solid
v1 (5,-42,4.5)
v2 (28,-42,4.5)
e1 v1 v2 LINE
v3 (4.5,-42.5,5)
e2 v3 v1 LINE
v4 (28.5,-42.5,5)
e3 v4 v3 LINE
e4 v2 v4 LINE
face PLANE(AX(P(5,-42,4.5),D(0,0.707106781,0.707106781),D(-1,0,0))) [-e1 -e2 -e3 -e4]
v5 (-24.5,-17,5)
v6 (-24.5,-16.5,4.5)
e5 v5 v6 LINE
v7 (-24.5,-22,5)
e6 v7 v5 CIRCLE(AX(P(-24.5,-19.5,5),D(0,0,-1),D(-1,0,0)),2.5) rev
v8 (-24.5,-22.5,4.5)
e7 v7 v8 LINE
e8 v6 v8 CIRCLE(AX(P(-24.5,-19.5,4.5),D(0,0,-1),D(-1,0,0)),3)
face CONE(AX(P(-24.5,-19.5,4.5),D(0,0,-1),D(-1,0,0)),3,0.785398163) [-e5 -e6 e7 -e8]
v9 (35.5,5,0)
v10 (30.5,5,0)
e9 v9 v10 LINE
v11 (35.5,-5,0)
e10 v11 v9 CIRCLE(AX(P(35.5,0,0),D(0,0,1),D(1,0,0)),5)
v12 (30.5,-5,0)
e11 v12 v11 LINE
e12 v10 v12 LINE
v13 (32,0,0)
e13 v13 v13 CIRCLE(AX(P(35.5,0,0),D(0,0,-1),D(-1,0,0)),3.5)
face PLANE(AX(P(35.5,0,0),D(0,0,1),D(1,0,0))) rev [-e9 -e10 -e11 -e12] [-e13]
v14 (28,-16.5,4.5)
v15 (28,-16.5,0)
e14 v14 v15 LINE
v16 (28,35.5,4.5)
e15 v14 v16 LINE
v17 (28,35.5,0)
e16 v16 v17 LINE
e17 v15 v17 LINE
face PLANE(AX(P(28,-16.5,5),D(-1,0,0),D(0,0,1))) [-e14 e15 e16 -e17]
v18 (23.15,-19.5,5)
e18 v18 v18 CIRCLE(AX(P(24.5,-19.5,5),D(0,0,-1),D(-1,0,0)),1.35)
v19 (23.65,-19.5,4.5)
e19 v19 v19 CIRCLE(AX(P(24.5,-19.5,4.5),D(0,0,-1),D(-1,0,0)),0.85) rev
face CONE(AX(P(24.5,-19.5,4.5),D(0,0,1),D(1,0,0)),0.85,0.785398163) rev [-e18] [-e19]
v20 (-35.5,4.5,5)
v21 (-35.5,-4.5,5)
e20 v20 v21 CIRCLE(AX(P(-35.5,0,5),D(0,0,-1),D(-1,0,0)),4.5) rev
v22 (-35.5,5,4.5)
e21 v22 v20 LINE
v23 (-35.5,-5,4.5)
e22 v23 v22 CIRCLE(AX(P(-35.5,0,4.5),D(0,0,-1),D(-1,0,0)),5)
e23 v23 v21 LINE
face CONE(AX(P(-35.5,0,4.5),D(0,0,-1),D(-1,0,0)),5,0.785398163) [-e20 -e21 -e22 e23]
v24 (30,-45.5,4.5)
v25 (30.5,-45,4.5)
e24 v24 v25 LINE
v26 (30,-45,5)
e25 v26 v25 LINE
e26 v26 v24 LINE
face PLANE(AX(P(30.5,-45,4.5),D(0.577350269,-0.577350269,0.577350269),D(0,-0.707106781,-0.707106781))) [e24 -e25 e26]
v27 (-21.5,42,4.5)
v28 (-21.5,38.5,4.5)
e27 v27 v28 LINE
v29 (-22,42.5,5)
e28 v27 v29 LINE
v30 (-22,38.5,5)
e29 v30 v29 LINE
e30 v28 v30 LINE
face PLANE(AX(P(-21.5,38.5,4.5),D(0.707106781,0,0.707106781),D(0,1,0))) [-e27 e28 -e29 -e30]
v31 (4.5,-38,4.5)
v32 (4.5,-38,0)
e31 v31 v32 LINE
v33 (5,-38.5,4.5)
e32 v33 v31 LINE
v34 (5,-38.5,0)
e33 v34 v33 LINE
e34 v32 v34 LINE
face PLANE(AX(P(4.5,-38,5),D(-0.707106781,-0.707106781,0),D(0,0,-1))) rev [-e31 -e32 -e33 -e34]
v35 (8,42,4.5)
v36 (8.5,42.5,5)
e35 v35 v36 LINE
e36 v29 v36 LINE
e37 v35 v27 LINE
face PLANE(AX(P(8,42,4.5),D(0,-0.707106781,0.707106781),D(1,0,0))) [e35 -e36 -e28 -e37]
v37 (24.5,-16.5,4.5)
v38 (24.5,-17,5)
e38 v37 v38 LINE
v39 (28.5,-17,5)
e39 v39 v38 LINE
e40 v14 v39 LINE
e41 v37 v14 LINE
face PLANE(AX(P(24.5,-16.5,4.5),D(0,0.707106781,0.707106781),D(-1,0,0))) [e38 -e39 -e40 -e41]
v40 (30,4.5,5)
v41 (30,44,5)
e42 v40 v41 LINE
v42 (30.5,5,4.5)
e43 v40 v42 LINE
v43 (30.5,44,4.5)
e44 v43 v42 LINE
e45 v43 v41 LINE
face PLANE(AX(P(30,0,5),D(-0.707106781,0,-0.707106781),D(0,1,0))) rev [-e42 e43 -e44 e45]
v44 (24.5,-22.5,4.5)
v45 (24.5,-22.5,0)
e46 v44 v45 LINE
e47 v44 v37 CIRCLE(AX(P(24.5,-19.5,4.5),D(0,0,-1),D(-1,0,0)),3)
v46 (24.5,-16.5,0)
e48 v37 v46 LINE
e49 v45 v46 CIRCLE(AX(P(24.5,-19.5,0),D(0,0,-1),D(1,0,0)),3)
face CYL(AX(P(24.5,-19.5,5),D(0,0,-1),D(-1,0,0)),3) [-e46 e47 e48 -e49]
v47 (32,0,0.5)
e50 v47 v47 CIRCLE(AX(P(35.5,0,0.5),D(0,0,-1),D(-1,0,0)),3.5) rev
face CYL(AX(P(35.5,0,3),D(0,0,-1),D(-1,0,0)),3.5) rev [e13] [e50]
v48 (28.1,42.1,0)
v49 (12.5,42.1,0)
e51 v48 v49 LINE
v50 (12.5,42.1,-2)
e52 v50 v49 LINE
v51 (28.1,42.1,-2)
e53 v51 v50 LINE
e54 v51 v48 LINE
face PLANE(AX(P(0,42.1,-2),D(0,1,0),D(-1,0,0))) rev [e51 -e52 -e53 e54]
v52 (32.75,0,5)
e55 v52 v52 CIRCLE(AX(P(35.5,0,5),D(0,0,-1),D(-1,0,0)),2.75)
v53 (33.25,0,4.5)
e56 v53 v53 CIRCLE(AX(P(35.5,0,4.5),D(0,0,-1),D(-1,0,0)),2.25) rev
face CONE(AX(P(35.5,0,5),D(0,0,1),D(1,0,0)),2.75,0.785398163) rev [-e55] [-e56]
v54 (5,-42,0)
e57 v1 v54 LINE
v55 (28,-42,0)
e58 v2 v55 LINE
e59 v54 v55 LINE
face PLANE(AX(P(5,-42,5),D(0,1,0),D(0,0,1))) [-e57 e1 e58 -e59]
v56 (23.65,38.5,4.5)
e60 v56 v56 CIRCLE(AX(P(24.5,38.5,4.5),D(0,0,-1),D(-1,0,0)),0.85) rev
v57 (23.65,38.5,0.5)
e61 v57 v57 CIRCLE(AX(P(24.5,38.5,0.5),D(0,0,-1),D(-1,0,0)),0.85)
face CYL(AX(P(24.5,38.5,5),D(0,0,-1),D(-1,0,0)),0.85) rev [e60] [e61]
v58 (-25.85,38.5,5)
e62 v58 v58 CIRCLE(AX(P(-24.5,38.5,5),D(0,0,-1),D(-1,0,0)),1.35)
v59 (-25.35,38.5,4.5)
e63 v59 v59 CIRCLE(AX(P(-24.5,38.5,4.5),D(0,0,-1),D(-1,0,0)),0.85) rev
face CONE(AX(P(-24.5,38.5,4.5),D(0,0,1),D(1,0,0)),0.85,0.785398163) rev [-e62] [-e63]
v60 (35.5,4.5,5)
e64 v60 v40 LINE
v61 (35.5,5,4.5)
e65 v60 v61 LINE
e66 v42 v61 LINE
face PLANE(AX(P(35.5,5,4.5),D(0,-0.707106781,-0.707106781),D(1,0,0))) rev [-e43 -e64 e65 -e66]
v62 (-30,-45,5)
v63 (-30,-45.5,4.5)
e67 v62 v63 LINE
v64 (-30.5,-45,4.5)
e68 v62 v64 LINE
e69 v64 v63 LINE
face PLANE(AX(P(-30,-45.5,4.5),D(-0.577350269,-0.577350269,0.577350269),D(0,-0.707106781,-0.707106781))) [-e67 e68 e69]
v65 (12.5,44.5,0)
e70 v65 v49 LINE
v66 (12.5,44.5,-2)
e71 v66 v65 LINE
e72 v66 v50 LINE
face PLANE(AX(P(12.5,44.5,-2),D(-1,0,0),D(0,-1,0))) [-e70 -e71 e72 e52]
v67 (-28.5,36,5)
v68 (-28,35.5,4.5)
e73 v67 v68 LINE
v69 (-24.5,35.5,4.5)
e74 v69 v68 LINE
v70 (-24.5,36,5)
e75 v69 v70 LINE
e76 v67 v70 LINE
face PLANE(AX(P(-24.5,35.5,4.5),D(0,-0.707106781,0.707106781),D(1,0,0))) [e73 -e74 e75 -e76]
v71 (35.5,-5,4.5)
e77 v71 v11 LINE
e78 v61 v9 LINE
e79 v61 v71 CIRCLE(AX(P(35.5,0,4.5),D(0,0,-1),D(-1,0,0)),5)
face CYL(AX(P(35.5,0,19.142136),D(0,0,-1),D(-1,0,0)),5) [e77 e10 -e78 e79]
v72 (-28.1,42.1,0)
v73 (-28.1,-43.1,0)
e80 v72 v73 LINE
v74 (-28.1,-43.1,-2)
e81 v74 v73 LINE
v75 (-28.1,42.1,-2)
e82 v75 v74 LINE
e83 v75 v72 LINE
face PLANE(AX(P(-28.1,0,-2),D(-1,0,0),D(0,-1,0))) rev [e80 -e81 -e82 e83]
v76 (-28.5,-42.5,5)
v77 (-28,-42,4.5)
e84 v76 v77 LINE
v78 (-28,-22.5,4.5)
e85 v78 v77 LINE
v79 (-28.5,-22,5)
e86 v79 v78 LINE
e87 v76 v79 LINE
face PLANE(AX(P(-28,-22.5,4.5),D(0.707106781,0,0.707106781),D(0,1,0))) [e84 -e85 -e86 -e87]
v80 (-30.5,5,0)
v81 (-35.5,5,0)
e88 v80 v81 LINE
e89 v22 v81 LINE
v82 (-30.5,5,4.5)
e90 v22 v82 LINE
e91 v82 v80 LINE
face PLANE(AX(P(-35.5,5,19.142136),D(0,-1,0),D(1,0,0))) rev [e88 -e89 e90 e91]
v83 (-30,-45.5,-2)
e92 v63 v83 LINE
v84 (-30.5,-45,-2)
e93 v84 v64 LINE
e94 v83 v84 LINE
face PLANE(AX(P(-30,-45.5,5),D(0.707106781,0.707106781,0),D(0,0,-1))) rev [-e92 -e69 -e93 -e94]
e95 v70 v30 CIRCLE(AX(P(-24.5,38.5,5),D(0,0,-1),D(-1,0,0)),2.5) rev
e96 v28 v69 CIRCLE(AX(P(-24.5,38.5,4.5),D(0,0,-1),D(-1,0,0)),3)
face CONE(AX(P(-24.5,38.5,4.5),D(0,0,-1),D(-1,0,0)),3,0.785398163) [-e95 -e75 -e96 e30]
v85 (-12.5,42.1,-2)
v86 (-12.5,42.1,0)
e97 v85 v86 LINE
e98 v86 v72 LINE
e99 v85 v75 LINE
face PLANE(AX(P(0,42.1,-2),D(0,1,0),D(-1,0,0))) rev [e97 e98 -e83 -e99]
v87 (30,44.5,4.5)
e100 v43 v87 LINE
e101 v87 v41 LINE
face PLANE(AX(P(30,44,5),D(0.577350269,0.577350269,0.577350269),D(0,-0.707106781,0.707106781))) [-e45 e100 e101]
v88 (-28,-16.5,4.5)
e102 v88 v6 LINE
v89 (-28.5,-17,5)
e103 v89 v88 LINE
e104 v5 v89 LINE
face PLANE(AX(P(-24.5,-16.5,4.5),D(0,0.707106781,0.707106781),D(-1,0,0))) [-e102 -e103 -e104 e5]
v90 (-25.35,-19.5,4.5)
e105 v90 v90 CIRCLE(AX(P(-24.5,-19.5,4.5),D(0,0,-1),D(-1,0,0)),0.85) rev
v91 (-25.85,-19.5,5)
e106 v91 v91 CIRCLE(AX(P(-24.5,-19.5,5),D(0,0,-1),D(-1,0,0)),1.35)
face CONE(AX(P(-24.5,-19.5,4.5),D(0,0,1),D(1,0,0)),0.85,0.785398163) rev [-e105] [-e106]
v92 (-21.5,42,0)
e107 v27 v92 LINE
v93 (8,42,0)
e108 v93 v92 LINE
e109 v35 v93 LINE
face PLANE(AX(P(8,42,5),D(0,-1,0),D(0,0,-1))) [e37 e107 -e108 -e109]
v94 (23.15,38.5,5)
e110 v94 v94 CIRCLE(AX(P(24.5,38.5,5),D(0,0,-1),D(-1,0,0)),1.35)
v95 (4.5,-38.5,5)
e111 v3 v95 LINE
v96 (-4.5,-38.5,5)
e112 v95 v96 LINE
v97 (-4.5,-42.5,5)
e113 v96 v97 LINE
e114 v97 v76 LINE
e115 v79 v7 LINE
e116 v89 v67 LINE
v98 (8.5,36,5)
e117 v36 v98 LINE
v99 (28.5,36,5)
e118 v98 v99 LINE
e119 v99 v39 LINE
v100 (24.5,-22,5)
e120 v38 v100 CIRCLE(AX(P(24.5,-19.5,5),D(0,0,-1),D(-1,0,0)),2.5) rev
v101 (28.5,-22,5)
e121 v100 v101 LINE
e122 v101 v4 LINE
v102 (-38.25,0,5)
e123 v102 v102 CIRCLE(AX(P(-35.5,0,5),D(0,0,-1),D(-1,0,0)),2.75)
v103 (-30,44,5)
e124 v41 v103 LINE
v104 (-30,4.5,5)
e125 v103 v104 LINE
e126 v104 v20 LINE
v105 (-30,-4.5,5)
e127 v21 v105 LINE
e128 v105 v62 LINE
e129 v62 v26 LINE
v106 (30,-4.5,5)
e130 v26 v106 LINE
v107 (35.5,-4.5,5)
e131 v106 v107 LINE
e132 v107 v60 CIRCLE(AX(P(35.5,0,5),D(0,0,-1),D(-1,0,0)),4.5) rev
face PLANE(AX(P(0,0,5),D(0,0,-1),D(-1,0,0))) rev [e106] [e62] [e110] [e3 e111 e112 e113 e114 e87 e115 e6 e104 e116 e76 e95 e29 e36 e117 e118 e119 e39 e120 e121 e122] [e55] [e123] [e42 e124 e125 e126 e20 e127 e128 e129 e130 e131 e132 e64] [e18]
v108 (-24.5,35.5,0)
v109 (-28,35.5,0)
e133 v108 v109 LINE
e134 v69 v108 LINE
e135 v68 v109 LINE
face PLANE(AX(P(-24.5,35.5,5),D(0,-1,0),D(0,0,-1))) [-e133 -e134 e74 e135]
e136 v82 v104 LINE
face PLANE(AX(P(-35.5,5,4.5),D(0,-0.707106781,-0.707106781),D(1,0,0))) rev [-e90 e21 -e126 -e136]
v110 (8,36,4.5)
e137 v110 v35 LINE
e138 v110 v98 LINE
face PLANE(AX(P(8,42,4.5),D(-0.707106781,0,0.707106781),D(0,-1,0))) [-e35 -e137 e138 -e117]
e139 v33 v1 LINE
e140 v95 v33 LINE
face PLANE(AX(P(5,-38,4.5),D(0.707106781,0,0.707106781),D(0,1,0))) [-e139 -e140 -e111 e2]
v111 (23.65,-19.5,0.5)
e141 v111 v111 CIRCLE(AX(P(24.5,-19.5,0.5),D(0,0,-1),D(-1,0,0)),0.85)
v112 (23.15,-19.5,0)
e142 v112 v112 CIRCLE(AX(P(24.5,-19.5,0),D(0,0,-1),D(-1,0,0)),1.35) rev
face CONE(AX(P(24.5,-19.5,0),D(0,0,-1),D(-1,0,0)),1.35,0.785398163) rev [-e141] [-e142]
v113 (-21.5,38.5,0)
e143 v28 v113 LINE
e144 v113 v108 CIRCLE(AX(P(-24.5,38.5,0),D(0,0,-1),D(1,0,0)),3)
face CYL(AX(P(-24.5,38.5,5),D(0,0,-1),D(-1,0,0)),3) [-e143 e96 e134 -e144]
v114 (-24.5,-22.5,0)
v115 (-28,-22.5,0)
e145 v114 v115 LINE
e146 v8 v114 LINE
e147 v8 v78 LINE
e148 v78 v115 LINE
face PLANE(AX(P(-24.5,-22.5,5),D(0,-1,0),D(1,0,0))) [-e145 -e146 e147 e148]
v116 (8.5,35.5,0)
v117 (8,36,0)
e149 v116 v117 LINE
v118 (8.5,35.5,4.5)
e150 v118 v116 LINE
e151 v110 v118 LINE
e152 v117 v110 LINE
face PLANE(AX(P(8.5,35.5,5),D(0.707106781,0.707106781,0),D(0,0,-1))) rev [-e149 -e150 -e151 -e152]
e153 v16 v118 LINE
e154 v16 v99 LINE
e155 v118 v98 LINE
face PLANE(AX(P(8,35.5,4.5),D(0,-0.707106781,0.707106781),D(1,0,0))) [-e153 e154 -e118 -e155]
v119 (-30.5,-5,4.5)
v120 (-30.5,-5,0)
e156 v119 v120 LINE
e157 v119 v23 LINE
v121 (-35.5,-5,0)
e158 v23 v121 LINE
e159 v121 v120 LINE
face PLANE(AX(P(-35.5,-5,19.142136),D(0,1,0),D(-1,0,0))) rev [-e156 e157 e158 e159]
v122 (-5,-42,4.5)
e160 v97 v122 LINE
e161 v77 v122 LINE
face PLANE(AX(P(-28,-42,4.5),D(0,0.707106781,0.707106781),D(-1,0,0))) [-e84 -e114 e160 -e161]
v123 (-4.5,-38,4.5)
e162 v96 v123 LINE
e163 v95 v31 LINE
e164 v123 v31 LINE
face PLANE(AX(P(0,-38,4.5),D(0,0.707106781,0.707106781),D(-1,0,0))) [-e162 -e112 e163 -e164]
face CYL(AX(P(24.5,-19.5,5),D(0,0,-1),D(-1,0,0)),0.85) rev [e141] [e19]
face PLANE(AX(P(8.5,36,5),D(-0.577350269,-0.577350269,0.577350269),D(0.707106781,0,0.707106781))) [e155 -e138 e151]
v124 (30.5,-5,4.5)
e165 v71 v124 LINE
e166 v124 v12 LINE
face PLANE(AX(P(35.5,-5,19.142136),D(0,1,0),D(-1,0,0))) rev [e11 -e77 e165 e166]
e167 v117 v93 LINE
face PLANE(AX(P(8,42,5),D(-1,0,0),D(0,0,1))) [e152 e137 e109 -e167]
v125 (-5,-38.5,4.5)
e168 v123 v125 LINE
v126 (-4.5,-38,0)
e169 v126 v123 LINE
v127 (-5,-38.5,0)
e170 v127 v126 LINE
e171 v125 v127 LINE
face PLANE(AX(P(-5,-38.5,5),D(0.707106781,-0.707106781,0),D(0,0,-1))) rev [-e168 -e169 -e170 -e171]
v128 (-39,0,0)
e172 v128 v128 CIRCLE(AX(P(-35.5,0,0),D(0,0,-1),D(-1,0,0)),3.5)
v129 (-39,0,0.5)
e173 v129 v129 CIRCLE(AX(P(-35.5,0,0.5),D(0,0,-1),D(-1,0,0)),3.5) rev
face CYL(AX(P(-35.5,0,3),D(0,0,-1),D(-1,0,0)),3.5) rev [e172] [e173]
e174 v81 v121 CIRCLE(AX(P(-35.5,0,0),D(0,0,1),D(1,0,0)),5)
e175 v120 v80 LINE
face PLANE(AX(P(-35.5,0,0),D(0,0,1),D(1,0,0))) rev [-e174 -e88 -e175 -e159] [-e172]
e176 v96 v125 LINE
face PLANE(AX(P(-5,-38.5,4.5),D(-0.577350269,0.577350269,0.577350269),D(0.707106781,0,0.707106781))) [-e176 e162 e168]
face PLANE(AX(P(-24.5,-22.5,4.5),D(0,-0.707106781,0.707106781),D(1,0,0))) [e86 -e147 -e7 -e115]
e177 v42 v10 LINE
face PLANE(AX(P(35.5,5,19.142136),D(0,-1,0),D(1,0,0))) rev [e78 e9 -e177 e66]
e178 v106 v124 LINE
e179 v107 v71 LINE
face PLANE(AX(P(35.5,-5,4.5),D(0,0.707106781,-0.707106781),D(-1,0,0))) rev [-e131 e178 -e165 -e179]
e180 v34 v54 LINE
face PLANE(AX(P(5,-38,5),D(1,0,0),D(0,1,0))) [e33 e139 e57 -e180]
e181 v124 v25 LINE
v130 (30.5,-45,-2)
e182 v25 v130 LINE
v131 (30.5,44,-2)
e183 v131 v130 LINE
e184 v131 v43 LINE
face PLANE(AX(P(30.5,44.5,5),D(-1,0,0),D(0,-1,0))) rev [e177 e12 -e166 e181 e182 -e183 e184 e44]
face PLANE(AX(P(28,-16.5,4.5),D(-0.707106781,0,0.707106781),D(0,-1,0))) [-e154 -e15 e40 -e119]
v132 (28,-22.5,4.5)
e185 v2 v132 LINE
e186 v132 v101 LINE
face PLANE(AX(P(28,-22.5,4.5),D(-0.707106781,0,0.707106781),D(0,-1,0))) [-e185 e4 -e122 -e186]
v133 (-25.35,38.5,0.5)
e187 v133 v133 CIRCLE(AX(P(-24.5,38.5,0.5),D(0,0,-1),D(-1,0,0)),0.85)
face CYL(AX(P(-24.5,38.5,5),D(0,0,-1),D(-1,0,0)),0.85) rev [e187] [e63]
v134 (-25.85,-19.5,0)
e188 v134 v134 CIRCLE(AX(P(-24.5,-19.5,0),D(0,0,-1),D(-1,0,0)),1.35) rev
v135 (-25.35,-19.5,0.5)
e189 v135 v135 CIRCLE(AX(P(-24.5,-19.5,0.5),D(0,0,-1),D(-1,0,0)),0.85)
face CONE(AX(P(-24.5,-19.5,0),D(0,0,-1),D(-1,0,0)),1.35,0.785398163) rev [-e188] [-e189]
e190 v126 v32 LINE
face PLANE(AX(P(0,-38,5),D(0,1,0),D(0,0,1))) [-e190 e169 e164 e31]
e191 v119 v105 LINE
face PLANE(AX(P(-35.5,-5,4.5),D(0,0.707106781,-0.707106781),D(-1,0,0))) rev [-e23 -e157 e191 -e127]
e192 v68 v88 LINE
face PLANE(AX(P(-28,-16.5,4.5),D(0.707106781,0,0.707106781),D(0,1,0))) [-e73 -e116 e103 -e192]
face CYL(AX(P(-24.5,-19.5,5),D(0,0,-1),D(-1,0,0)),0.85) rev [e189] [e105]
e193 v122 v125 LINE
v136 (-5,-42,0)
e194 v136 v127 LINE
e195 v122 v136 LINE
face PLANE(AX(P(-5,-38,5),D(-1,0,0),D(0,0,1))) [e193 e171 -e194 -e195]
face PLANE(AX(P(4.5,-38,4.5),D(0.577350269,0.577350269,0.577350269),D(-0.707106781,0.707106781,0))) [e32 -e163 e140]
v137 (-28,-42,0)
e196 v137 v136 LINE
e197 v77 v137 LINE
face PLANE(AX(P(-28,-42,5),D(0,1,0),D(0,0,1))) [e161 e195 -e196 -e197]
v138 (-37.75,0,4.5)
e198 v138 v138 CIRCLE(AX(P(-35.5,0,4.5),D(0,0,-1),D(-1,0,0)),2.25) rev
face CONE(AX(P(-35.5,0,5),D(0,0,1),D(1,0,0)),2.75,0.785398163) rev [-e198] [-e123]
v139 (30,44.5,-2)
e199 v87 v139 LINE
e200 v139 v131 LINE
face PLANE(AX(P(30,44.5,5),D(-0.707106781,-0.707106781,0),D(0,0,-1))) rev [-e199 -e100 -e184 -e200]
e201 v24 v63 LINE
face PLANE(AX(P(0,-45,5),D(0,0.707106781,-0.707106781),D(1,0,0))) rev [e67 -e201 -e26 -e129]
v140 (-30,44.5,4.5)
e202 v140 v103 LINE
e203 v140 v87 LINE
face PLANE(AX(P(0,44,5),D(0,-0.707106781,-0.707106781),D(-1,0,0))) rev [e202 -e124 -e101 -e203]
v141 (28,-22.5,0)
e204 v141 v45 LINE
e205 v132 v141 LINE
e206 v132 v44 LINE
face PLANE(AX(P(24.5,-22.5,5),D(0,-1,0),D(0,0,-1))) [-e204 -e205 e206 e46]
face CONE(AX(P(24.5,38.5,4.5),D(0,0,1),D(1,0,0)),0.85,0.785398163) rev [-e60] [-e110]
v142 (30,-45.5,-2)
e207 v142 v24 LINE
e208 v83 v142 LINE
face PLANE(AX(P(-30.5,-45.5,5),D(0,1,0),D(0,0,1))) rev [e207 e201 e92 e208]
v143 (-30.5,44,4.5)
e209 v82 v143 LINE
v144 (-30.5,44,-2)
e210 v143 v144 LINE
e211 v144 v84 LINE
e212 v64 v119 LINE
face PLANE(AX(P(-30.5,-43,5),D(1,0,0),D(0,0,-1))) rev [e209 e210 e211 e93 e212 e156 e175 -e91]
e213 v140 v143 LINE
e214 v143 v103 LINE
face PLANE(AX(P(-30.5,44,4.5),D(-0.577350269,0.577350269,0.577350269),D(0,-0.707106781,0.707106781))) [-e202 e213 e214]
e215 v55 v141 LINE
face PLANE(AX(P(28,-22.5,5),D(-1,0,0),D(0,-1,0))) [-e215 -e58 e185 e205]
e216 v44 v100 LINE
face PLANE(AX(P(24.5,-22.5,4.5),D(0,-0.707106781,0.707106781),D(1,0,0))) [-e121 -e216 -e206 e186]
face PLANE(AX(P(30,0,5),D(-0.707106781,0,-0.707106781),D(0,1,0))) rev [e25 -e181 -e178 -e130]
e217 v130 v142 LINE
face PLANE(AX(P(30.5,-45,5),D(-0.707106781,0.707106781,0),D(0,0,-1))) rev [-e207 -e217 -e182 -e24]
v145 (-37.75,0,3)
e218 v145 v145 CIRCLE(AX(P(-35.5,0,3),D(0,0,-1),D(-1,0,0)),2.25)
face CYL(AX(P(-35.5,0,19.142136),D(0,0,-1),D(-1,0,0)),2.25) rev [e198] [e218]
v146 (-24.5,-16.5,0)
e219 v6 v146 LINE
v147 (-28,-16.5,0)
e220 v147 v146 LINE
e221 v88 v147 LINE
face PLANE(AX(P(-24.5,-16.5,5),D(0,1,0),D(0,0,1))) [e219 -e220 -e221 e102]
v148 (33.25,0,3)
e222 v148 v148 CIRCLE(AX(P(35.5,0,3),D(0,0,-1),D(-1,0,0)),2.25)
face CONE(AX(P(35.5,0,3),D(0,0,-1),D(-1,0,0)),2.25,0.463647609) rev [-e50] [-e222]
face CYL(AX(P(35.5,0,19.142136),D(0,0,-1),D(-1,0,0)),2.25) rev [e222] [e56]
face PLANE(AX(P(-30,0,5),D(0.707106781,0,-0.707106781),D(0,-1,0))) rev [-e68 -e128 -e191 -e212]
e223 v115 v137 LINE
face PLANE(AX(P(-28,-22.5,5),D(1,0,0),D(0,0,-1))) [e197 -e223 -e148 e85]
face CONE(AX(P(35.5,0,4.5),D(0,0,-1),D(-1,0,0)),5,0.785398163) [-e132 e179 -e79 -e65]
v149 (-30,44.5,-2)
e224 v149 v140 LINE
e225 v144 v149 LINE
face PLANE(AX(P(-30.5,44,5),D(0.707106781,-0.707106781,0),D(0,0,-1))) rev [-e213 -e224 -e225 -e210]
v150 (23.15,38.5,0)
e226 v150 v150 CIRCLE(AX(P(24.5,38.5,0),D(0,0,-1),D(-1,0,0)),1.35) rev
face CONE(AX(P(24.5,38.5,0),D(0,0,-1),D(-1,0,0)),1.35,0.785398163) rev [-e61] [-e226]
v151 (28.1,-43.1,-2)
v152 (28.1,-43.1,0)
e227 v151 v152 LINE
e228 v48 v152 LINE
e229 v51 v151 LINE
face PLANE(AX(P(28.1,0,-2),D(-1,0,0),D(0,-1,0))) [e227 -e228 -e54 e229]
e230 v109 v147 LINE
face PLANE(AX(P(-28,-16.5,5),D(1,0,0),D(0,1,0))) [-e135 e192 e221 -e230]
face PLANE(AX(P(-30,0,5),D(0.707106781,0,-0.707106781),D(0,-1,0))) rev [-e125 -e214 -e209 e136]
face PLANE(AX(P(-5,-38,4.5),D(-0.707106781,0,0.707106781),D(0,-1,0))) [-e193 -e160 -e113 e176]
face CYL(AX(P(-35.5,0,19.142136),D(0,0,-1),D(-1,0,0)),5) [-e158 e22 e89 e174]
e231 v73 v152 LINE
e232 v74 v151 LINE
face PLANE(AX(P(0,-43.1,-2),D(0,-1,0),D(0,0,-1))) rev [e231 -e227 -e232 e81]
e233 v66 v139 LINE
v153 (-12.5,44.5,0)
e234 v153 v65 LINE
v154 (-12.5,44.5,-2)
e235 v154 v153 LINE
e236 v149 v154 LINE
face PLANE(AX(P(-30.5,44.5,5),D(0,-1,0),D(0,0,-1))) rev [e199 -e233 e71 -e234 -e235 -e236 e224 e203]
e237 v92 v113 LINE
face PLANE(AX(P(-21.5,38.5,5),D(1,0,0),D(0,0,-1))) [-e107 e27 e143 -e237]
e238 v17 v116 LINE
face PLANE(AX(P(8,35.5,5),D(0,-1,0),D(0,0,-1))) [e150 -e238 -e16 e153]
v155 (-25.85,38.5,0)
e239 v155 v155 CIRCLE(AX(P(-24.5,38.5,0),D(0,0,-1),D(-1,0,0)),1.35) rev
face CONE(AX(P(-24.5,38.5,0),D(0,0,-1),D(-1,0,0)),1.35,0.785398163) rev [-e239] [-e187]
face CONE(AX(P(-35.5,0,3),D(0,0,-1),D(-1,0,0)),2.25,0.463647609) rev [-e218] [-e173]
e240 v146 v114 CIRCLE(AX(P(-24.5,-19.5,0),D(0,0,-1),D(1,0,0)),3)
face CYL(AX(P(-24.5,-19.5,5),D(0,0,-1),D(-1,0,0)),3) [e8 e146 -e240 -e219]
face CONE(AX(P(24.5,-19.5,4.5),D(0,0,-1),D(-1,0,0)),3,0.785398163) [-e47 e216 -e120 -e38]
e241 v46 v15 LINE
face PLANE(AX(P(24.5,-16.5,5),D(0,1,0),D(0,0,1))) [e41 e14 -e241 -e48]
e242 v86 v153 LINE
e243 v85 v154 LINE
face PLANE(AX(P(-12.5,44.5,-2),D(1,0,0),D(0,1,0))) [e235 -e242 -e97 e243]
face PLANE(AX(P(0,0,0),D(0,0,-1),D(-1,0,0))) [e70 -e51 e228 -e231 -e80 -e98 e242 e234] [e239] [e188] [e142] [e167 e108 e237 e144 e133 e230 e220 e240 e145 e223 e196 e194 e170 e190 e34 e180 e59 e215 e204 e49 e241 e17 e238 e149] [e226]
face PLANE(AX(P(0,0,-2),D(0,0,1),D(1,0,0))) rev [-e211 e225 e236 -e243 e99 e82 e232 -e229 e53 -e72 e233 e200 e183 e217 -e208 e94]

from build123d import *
from OCP.BRepFilletAPI import BRepFilletAPI_MakeChamfer

# Parameters (mm, degrees)
SKETCH1_R           = 0.85
BOSS_EXTRUDE1_DEPTH = 5
SKETCH2_W           = 56.2
SKETCH2_H           = 85.2
BOSS_EXTRUDE2_DEPTH = 2
SKETCH3_R           = 2.25
BOSS_EXTRUDE3_DEPTH = 5
SKETCH4_R           = 3.5
CUT_EXTRUDE1_DEPTH  = 3
SKETCH5_W           = 25
SKETCH5_H           = 2.4
CUT_EXTRUDE2_DEPTH  = 62.118736898
CHAMFER3_SIZE       = 0.5
CHAMFER1_SIZE       = 2.5
CHAMFER1_SIZE_2     = 1.25


with BuildPart() as part:
    # Sketch1 → Boss-Extrude1 (new body)
    with BuildSketch(Plane.XY):
        Polygon((-30.5, -43), (-30.5, 44.5), (30.5, 44.5), (30.5, -43), (30.5, -45.5), (-30.5, -45.5), align=None)
        with Locations((-24.5, 38.5)):
            Circle(SKETCH1_R, mode=Mode.SUBTRACT)
        with Locations((24.5, 38.5)):
            Circle(SKETCH1_R, mode=Mode.SUBTRACT)
        with Locations((24.5, -19.5)):
            Circle(SKETCH1_R, mode=Mode.SUBTRACT)
        with Locations((-24.5, -19.5)):
            Circle(SKETCH1_R, mode=Mode.SUBTRACT)
        with BuildLine():
            Line((-21.5, 38.5), (-21.5, 42))
            Line((-21.5, 42), (8, 42))
            Line((8, 42), (8, 35.5))
            Line((8, 35.5), (24.5, 35.5))
            Line((24.5, 35.5), (28, 35.5))
            Line((28, 35.5), (28, -16.5))
            Line((28, -16.5), (24.5, -16.5))
            ThreePointArc((24.5, -16.5), (21.5, -19.5), (24.5, -22.5))
            Line((24.5, -22.5), (28, -22.5))
            Line((28, -22.5), (28, -42))
            Line((28, -42), (5, -42))
            Line((5, -42), (5, -38))
            Line((5, -38), (0, -38))
            Line((0, -38), (-5, -38))
            Line((-5, -38), (-5, -42))
            Line((-5, -42), (-28, -42))
            Line((-28, -42), (-28, -22.5))
            Line((-28, -22.5), (-24.5, -22.5))
            ThreePointArc((-24.5, -22.5), (-21.5, -19.5), (-24.5, -16.5))
            Line((-24.5, -16.5), (-28, -16.5))
            Line((-28, -16.5), (-28, 35.5))
            Line((-28, 35.5), (-24.5, 35.5))
            ThreePointArc((-24.5, 35.5), (-22.378679656, 36.378679656), (-21.5, 38.5))
        make_face(mode=Mode.SUBTRACT)
    extrude(amount=BOSS_EXTRUDE1_DEPTH)

    # Sketch2 → Boss-Extrude2 (add)
    with BuildSketch(Plane.XY):
        Polygon((30.5, -45.5), (30.5, 44.5), (-30.5, 44.5), (-30.5, -45.5), (-28.1, -45.5), (28.1, -45.5), align=None)
        with Locations((0, -0.5)):
            Rectangle(SKETCH2_W, SKETCH2_H, mode=Mode.SUBTRACT)
    extrude(amount=-BOSS_EXTRUDE2_DEPTH)

    # Sketch3 → Boss-Extrude3 (add)
    # profile 1 of 2: a face of its own
    with BuildSketch(Plane.XY):
        with BuildLine():
            Line((35.5, 5), (30.5, 5))
            Line((30.5, 5), (30.5, -5))
            Line((30.5, -5), (35.5, -5))
            ThreePointArc((35.5, -5), (40.5, 0), (35.5, 5))
        make_face()
        with Locations(Location((35.5, 0, 0), (0, 0, 180))):
            Circle(SKETCH3_R, mode=Mode.SUBTRACT)
    # profile 2 of 2: a face of its own
    with BuildSketch(Plane.XY):
        with BuildLine():
            Line((-35.5, 5), (-30.5, 5))
            Line((-30.5, 5), (-30.5, -5))
            Line((-30.5, -5), (-35.5, -5))
            ThreePointArc((-35.5, -5), (-40.5, 0), (-35.5, 5))
        make_face()
        with Locations(Location((-35.5, 0, 0), (0, 0, 180))):
            Circle(SKETCH3_R, mode=Mode.SUBTRACT)
    extrude(amount=BOSS_EXTRUDE3_DEPTH)

    # Sketch4 → Cut-Extrude1 (cut)
    with BuildSketch(Plane(origin=(0, 0, 0), x_dir=(-1, 0, 0), z_dir=(0, 0, -1))):
        with Locations((-35.5, 0)):
            Circle(SKETCH4_R)
        with Locations((35.5, 0)):
            Circle(SKETCH4_R)
    extrude(amount=-CUT_EXTRUDE1_DEPTH, mode=Mode.SUBTRACT)

    # Sketch5 → Cut-Extrude2 (cut, through all)
    with BuildSketch(Plane(origin=(0, 0, 0), x_dir=(-1, 0, 0), z_dir=(0, 0, -1))):
        with Locations((0, 43.3)):
            Rectangle(SKETCH5_W, SKETCH5_H)
    extrude(amount=CUT_EXTRUDE2_DEPTH, mode=Mode.SUBTRACT)

    # Chamfer3
    chamfer3_edges = [part.edges().sort_by_distance(p)[0] for p in [
        (30.5, 44.5, 1.5),
        (30.5, -45.5, 1.5),
        (-30.5, -45.5, 1.5),
        (-30.5, 44.5, 1.5),
        (30.5, 24.75, 5),
        (40.5, 0, 5),
        (33, 5, 5),
        (33, -5, 5),
        (37.75, 0, 5),
        (-30.5, -25.25, 5),
        (-40.5, 0, 5),
        (-33, -5, 5),
        (-33, 5, 5),
        (-33.25, 0, 5),
        (0, -45.5, 5),
        (-25.35, 38.5, 0),
        (-25.35, 38.5, 5),
        (30.5, -25.25, 5),
        (23.65, 38.5, 0),
        (23.65, 38.5, 5),
        (-5, -38, 2.5),
        (5, -38, 2.5),
        (0, 44.5, 5),
        (8, 35.5, 2.5),
        (-22.378679656, 36.378679656, 5),
        (-26.25, 35.5, 5),
        (-28, 9.5, 5),
        (-26.25, -16.5, 5),
        (-21.5, -19.5, 5),
        (-26.25, -22.5, 5),
        (-28, -32.25, 5),
        (-16.5, -42, 5),
        (-5, -40, 5),
        (0, -38, 5),
        (5, -40, 5),
        (16.5, -42, 5),
        (28, -32.25, 5),
        (26.25, -22.5, 5),
        (21.5, -19.5, 5),
        (26.25, -16.5, 5),
        (28, 9.5, 5),
        (18, 35.5, 5),
        (8, 38.75, 5),
        (-6.75, 42, 5),
        (-21.5, 40.25, 5),
        (23.65, -19.5, 0),
        (23.65, -19.5, 5),
        (-25.35, -19.5, 0),
        (-25.35, -19.5, 5),
        (-30.5, 24.75, 5),
    ]]
    chamfer(chamfer3_edges, length=CHAMFER3_SIZE)

    # Chamfer1
    chamfer1_edges_1 = [part.edges().sort_by_distance(p)[0] for p in [
        (39, 0, 3),
    ]]
    chamfer1_side_1 = [part.faces().sort_by_distance(p)[0] for p in [
        (39, 0, 2.975),
    ]]
    chamfer1_edges_2 = [part.edges().sort_by_distance(p)[0] for p in [
        (-32, 0, 3),
    ]]
    chamfer1_side_2 = [part.faces().sort_by_distance(p)[0] for p in [
        (-32, 0, 2.975),
    ]]
    chamfer1 = BRepFilletAPI_MakeChamfer(part.part.solid().wrapped)
    for e in chamfer1_edges_1:
        chamfer1.Add(CHAMFER1_SIZE - 0.0001, CHAMFER1_SIZE_2 - 0.0001, e.wrapped, chamfer1_side_1[0].wrapped)
    for e in chamfer1_edges_2:
        chamfer1.Add(CHAMFER1_SIZE - 0.0001, CHAMFER1_SIZE_2 - 0.0001, e.wrapped, chamfer1_side_2[0].wrapped)
    add(Compound.cast(chamfer1.Shape()), mode=Mode.REPLACE)  # a hair under: the kernel refuses the full size


solid = part.part
